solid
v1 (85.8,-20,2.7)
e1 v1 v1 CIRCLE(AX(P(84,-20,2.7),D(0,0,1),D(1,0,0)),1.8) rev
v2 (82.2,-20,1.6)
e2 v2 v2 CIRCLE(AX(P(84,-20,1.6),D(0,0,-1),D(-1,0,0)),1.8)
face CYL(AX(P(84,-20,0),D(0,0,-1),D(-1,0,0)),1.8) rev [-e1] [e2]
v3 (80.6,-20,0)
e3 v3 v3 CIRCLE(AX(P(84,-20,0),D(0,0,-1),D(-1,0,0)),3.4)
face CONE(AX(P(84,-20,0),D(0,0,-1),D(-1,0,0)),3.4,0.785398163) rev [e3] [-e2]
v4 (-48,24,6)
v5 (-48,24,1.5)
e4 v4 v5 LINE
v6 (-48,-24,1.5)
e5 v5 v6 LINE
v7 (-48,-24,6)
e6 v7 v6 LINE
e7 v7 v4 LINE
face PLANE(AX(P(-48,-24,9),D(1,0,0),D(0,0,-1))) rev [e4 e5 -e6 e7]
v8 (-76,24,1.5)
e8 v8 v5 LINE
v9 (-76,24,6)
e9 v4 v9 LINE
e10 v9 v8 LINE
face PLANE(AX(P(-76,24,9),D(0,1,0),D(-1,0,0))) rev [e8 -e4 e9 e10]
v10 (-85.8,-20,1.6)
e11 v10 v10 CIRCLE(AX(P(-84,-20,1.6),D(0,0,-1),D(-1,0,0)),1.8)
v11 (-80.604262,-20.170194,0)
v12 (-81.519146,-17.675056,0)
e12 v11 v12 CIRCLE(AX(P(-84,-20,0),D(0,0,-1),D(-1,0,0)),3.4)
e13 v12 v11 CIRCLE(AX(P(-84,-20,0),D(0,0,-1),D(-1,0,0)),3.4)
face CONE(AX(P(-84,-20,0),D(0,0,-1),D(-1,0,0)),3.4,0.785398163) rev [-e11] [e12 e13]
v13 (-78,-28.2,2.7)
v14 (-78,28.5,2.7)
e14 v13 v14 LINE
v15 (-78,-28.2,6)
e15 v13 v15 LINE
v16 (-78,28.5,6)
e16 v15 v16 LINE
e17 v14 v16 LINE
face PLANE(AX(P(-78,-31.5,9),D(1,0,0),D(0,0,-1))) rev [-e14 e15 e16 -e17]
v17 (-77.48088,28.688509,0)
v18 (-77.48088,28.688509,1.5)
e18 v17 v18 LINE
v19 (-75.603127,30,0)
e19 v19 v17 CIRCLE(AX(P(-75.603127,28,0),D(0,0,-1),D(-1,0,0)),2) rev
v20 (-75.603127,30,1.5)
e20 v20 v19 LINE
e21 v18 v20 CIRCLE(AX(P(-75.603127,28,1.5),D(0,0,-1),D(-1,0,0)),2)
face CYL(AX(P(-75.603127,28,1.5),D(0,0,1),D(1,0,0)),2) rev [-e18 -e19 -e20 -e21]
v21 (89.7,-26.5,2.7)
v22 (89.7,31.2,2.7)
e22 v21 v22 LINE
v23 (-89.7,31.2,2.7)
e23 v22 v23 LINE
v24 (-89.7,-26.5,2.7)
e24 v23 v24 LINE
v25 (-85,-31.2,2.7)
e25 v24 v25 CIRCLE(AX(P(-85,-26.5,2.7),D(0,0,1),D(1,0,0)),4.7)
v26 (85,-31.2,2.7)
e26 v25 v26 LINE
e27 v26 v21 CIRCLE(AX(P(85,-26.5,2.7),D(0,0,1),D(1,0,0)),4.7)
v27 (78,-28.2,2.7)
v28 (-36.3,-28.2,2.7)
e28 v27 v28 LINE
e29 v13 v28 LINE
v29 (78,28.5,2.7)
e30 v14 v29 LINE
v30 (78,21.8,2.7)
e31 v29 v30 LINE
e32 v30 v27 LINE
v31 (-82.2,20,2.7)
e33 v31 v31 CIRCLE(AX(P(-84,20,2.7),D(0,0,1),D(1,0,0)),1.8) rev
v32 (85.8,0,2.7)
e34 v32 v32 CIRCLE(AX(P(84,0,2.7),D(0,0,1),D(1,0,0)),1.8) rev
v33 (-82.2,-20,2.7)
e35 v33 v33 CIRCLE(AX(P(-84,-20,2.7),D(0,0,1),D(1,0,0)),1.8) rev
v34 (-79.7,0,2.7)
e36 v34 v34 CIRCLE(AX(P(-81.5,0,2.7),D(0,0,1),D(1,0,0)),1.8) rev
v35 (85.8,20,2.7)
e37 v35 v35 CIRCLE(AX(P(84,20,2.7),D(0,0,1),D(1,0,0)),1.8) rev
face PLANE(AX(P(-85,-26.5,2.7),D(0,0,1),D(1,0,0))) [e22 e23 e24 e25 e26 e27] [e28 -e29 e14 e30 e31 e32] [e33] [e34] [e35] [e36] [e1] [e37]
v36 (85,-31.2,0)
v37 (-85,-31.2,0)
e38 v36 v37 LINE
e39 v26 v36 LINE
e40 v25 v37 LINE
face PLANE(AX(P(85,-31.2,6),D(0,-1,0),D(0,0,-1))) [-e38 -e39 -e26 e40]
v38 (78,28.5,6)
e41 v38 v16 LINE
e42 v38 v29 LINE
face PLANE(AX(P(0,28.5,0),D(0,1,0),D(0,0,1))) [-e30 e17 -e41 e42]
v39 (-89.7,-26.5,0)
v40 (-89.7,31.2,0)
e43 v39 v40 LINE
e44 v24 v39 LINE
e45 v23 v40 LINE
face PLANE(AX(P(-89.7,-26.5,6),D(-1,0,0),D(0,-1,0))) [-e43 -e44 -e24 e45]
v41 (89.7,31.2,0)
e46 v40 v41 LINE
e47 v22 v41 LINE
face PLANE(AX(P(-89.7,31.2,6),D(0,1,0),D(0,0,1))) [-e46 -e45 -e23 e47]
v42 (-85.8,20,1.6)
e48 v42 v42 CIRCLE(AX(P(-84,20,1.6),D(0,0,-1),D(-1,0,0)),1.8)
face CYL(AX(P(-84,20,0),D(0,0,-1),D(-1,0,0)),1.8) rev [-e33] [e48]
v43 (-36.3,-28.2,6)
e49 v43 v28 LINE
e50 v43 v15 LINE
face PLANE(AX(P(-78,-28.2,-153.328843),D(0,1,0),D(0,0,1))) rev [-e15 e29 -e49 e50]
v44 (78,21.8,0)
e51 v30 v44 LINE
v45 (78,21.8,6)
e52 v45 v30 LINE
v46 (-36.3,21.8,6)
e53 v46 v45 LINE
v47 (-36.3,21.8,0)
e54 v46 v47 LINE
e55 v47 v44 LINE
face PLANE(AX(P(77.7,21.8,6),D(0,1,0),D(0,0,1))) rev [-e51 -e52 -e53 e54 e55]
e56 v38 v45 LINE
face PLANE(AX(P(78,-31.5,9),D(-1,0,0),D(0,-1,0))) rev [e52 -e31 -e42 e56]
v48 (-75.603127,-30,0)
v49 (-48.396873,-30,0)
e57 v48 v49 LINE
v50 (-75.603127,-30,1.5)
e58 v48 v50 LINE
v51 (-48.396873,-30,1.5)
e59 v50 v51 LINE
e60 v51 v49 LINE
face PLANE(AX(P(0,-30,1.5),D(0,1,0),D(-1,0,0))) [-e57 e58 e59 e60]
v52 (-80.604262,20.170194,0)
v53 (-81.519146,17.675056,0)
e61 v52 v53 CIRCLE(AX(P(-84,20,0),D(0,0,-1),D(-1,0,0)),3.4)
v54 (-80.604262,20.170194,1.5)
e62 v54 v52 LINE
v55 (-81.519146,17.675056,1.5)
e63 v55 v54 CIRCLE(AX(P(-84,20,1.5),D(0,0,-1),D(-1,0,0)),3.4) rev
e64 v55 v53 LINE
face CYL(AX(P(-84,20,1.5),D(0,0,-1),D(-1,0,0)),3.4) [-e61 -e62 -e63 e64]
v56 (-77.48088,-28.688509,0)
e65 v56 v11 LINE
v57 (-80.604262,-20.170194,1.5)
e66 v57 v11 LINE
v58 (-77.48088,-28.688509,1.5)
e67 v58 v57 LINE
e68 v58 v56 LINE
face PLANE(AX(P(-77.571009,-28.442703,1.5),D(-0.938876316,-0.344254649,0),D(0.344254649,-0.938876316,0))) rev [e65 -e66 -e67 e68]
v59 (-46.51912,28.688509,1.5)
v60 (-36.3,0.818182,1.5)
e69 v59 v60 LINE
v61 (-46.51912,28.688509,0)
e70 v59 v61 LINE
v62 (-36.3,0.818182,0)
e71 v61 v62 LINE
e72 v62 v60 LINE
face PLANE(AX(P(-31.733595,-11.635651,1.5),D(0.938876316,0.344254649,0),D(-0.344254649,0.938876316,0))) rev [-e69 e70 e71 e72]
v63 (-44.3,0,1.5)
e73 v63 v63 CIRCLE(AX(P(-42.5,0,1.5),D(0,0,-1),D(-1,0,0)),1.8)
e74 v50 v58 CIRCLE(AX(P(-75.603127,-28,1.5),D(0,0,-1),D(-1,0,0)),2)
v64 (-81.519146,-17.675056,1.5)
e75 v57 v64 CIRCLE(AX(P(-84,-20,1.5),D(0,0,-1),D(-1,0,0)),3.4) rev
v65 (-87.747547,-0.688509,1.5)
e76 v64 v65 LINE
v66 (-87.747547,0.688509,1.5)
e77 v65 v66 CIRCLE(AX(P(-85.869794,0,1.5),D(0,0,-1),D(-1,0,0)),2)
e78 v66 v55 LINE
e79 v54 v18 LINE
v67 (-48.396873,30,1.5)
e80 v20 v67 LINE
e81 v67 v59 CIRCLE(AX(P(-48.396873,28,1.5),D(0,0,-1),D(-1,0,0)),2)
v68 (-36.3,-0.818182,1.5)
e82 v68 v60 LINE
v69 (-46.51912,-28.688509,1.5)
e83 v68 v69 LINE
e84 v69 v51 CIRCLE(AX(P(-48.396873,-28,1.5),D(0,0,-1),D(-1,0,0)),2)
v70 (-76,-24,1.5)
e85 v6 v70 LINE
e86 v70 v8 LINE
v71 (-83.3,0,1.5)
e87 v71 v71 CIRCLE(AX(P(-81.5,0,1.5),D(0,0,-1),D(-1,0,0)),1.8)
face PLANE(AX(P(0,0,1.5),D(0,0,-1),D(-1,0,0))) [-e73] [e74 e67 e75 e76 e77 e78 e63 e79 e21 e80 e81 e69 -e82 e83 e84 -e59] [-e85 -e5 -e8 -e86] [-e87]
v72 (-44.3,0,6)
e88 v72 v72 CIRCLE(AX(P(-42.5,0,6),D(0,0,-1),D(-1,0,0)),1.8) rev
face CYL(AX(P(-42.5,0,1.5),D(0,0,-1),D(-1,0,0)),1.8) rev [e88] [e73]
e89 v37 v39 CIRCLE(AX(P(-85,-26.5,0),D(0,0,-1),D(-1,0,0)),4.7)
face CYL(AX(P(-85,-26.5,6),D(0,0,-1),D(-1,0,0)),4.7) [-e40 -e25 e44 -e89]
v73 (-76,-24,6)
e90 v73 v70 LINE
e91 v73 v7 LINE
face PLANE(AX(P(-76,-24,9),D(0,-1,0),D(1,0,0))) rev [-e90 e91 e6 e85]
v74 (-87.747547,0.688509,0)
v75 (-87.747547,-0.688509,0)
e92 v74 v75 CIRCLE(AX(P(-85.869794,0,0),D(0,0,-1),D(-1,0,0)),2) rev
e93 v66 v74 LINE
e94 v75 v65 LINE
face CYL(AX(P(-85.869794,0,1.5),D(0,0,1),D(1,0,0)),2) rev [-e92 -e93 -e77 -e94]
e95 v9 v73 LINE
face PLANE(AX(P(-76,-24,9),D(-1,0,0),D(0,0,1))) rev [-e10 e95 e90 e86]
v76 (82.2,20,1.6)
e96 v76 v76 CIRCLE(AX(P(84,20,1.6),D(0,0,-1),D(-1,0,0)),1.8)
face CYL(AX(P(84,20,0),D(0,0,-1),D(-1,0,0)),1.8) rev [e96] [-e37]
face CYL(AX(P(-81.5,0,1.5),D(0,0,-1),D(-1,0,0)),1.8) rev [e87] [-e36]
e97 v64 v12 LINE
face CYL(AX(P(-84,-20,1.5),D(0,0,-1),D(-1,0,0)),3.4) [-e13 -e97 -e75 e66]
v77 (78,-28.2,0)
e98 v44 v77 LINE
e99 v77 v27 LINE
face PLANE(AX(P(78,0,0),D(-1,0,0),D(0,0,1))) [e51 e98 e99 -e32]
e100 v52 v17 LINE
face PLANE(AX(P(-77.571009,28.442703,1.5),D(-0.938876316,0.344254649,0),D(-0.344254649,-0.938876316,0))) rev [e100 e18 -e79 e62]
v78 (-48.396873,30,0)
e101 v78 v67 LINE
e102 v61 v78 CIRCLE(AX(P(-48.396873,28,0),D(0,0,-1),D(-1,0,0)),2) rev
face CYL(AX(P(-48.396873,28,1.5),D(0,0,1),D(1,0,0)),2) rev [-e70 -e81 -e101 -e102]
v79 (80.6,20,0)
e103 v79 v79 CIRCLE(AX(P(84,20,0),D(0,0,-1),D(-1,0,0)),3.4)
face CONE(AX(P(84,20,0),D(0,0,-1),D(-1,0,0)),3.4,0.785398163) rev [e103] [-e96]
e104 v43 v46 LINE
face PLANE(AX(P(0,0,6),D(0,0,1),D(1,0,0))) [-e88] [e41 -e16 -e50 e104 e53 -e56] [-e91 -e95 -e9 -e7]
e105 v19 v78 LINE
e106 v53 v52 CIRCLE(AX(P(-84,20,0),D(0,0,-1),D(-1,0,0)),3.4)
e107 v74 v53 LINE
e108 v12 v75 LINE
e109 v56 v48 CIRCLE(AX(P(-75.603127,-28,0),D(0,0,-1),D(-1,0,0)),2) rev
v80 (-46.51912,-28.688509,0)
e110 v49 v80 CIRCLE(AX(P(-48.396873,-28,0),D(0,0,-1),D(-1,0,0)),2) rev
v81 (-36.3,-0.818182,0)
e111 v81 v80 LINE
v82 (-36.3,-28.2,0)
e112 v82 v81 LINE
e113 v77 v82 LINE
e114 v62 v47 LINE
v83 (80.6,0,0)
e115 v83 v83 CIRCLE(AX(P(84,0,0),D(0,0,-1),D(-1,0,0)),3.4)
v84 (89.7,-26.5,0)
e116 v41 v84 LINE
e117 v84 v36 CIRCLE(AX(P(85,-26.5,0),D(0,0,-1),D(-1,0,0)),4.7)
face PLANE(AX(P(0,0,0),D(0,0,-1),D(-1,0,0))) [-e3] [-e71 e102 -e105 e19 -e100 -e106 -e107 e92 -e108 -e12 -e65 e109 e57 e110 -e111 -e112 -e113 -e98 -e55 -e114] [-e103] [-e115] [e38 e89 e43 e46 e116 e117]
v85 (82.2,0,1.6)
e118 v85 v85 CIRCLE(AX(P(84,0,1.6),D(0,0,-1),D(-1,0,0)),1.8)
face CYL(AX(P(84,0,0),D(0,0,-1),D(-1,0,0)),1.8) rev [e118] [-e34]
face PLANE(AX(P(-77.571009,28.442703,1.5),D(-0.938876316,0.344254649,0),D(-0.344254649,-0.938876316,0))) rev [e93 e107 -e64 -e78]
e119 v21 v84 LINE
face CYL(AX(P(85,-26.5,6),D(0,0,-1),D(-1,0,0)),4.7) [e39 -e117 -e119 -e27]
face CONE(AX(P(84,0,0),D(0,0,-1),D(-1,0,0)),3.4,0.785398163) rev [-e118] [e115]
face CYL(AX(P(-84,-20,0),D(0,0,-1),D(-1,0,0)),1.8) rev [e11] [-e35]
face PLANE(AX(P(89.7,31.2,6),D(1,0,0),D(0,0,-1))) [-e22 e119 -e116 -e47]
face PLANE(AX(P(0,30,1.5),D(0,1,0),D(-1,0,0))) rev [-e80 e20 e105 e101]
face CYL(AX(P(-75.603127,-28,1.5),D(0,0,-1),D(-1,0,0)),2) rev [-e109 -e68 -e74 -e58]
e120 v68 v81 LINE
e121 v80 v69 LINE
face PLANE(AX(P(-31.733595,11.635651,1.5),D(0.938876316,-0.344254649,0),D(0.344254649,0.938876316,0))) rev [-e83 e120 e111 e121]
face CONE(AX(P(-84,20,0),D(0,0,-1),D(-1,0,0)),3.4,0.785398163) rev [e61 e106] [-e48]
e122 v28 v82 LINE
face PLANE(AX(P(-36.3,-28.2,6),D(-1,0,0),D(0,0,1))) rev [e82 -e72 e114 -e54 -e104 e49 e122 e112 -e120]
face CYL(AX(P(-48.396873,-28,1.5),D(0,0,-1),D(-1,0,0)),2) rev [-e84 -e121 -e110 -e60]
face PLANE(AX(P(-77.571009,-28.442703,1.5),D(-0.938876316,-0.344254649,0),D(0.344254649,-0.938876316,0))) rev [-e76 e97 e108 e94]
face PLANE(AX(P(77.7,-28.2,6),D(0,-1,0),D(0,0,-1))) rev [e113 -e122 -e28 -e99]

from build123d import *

# Parameters (mm, degrees)
SKETCH1_W                                       = 180
SKETCH1_H                                       = 63
BOSS_EXTRUDE1_DEPTH                             = 3
FILLET1_R                                       = 5
SKETCH2_W                                       = 156
SKETCH2_H                                       = 63
BOSS_EXTRUDE2_DEPTH                             = 6
CSK_FOR_M3_FLAT_HEAD_MACHINE_SCREW1_D           = 3.6
CSK_FOR_M3_FLAT_HEAD_MACHINE_SCREW1_DEPTH       = 8
CSK_FOR_M3_FLAT_HEAD_MACHINE_SCREW1_CSINK_D     = 6.8
CSK_FOR_M3_FLAT_HEAD_MACHINE_SCREW1_CSINK_ANGLE = 90
CSK_FOR_M3_FLAT_HEAD_MACHINE_SCREW1_TIP         = 1.081549114
CUT_EXTRUDE1_START                              = -1.5
CUT_EXTRUDE1_DEPTH                              = 1.5
SKETCH6_W                                       = 28
SKETCH6_H                                       = 48
CUT_EXTRUDE2_DEPTH                              = 96.647791402
FILLET2_R                                       = 2
M3_CLEARANCE_HOLE1_D                            = 3.6
M3_CLEARANCE_HOLE1_DEPTH                        = 8
M3_CLEARANCE_HOLE1_TIP                          = 1.081549114
SKETCH15_W                                      = 95
SKETCH15_H                                      = 63
CUT_EXTRUDE3_DEPTH                              = 3
SKETCH18_W                                      = 180
SKETCH18_H                                      = 8
CUT_EXTRUDE8_DEPTH                              = 3
SKETCH21_W                                      = 4
SKETCH21_H                                      = 60
CUT_EXTRUDE10_DEPTH                             = 3
SKETCH22_W                                      = 3
SKETCH22_H                                      = 60
CUT_EXTRUDE11_DEPTH                             = 116.733530146
CUT_EXTRUDE12_DEPTH                             = 0.3
CUT_EXTRUDE13_DEPTH                             = 96.541875636
SKETCH25_W                                      = 114
SKETCH25_H                                      = 50
CUT_EXTRUDE14_DEPTH                             = 96.160548548
SKETCH26_W                                      = 6
SKETCH26_H                                      = 50
CUT_EXTRUDE15_DEPTH                             = 0.3
SKETCH28_W                                      = 156
SKETCH28_H                                      = 3
CUT_EXTRUDE16_DEPTH                             = 3.3


# Read off the part's stored shape, not the designer's step: Cut-Extrude1
with BuildPart() as part:
    # Sketch1 → Boss-Extrude1 (new body)
    with BuildSketch(Plane.XY):
        Rectangle(SKETCH1_W, SKETCH1_H)
    extrude(amount=BOSS_EXTRUDE1_DEPTH)

    # Fillet1
    fillet1_edges = [part.edges().sort_by_distance(p)[0] for p in [
        (90, -31.5, 1.5),
        (-90, -31.5, 1.5),
    ]]
    fillet(fillet1_edges, radius=FILLET1_R)

    # Sketch2 → Boss-Extrude2 (add)
    with BuildSketch(Plane.XY.offset(3)):
        Rectangle(SKETCH2_W, SKETCH2_H)
    extrude(amount=BOSS_EXTRUDE2_DEPTH)

    # CSK for M3 Flat Head Machine Screw1
    with Locations(Plane(origin=(0, 0, 0), x_dir=(-1, 0, 0), z_dir=(0, 0, -1))):
        with Locations((-84, 20), (-84, -20), (84, 20), (84, -20), (-84, 0)):
            CounterSinkHole(CSK_FOR_M3_FLAT_HEAD_MACHINE_SCREW1_D / 2, CSK_FOR_M3_FLAT_HEAD_MACHINE_SCREW1_CSINK_D / 2, depth=CSK_FOR_M3_FLAT_HEAD_MACHINE_SCREW1_DEPTH, counter_sink_angle=CSK_FOR_M3_FLAT_HEAD_MACHINE_SCREW1_CSINK_ANGLE)
            with Locations((0, 0, -(CSK_FOR_M3_FLAT_HEAD_MACHINE_SCREW1_DEPTH + CSK_FOR_M3_FLAT_HEAD_MACHINE_SCREW1_TIP / 2))):  # 118° drill point
                Cone(0, CSK_FOR_M3_FLAT_HEAD_MACHINE_SCREW1_D / 2, CSK_FOR_M3_FLAT_HEAD_MACHINE_SCREW1_TIP, mode=Mode.SUBTRACT)

    # Cut-Extrude1 outline → Cut-Extrude1 (cut)
    with BuildSketch(Plane(origin=(0, 0, 0), x_dir=(-1, 0, 0), z_dir=(0, 0, -1)).offset(CUT_EXTRUDE1_START)):
        with BuildLine():
            Line((77, 30), (47, 30))
            Line((47, 30), (36, 0))
            Line((36, 0), (47, -30))
            Line((47, -30), (77, -30))
            Line((77, -30), (80.604262356, -20.170193575))
            ThreePointArc((80.604262356, -20.170193575), (80.807820526, -18.829534193), (81.519146067, -17.67505618))
            Line((81.519146067, -17.67505618), (88, 0))
            Line((88, 0), (81.519146067, 17.67505618))
            ThreePointArc((81.519146067, 17.67505618), (80.807820526, 18.829534193), (80.604262356, 20.170193575))
            Line((80.604262356, 20.170193575), (77, 30))
        make_face()
    extrude(amount=CUT_EXTRUDE1_DEPTH, mode=Mode.SUBTRACT)

    # Sketch6 → Cut-Extrude2 (cut, through all)
    with BuildSketch(Plane(origin=(0, 0, 1.5), x_dir=(-1, 0, 0), z_dir=(0, 0, -1))):
        with Locations((62, 0)):
            Rectangle(SKETCH6_W, SKETCH6_H)
    extrude(amount=-CUT_EXTRUDE2_DEPTH, mode=Mode.SUBTRACT)

    # Fillet2
    fillet2_edges = [part.edges().sort_by_distance(p)[0] for p in [
        (-36, 0, 0.75),
        (-47, 30, 0.75),
        (-77, 30, 0.75),
        (-88, 0, 0.75),
        (-77, -30, 0.75),
        (-47, -30, 0.75),
    ]]
    fillet(fillet2_edges, radius=FILLET2_R)

    # M3 Clearance Hole1
    with Locations(Plane(origin=(0, 0, 1.5), x_dir=(-1, 0, 0), z_dir=(0, 0, -1))):
        with Locations((42.5, 0), (81.5, 0)):
            Hole(M3_CLEARANCE_HOLE1_D / 2, depth=M3_CLEARANCE_HOLE1_DEPTH)
            with Locations((0, 0, -(M3_CLEARANCE_HOLE1_DEPTH + M3_CLEARANCE_HOLE1_TIP / 2))):  # 118° drill point
                Cone(0, M3_CLEARANCE_HOLE1_D / 2, M3_CLEARANCE_HOLE1_TIP, mode=Mode.SUBTRACT)

    # Sketch15 → Cut-Extrude3 (cut)
    with BuildSketch(Plane.XY.offset(9)):
        with Locations((26.5, 0)):
            Rectangle(SKETCH15_W, SKETCH15_H)
    extrude(amount=-CUT_EXTRUDE3_DEPTH, mode=Mode.SUBTRACT)

    # Sketch18 → Cut-Extrude8 (cut)
    with BuildSketch(Plane(origin=(0, 31.5, 0), x_dir=(1, 0, 0), z_dir=(0, 1, 0))):
        with Locations((0, -7)):
            Rectangle(SKETCH18_W, SKETCH18_H)
    extrude(amount=-CUT_EXTRUDE8_DEPTH, mode=Mode.SUBTRACT)

    # Sketch21 → Cut-Extrude10 (cut)
    with BuildSketch(Plane.XY.offset(9)):
        with Locations((76, -1.5)):
            Rectangle(SKETCH21_W, SKETCH21_H)
    extrude(amount=-CUT_EXTRUDE10_DEPTH, mode=Mode.SUBTRACT)

    # Sketch22 → Cut-Extrude11 (cut, through all)
    with BuildSketch(Plane(origin=(-21, 0, 0), x_dir=(0, 0, -1), z_dir=(1, 0, 0))):
        with Locations((-7.5, -1.5)):
            Rectangle(SKETCH22_W, SKETCH22_H)
    extrude(amount=-CUT_EXTRUDE11_DEPTH, mode=Mode.SUBTRACT)

    # Sketch23 → Cut-Extrude12 (cut)
    with BuildSketch(Plane.XY.offset(3)):
        with BuildLine():
            Line((90, 31.5), (-90, 31.5))
            Line((-90, 31.5), (-90, -26.5))
            ThreePointArc((-90, -26.5), (-88.535533906, -30.035533906), (-85, -31.5))
            Line((-85, -31.5), (-78, -31.5))
            Line((-78, -31.5), (-78, 28.5))
            Line((-78, 28.5), (78, 28.5))
            Line((78, 28.5), (78, -31.5))
            Line((78, -31.5), (85, -31.5))
            ThreePointArc((85, -31.5), (88.535533906, -30.035533906), (90, -26.5))
            Line((90, -26.5), (90, 31.5))
        make_face()
    extrude(amount=-CUT_EXTRUDE12_DEPTH, mode=Mode.SUBTRACT)

    # Sketch24 → Cut-Extrude13 (cut, through all)
    with BuildSketch(Plane(origin=(0, 0, 0), x_dir=(-1, 0, 0), z_dir=(0, 0, -1))):
        with BuildLine():
            Line((90, 31.5), (90, -26.5))
            ThreePointArc((90, -26.5), (88.535533906, -30.035533906), (85, -31.5))
            Line((85, -31.5), (-85, -31.5))
            ThreePointArc((-85, -31.5), (-88.535533906, -30.035533906), (-90, -26.5))
            Line((-90, -26.5), (-90, 31.5))
            Line((-90, 31.5), (90, 31.5))
        make_face()
        with BuildLine():
            Line((-85, -31.2), (85, -31.2))
            ThreePointArc((85, -31.2), (88.323401872, -29.823401872), (89.7, -26.5))
            Line((89.7, -26.5), (89.7, 31.2))
            Line((89.7, 31.2), (-89.7, 31.2))
            Line((-89.7, 31.2), (-89.7, -26.5))
            ThreePointArc((-89.7, -26.5), (-88.323401872, -29.823401872), (-85, -31.2))
        make_face(mode=Mode.SUBTRACT)
    extrude(amount=-CUT_EXTRUDE13_DEPTH, mode=Mode.SUBTRACT)

    # Sketch25 → Cut-Extrude14 (cut, through all)
    with BuildSketch(Plane(origin=(0, 0, 0), x_dir=(-1, 0, 0), z_dir=(0, 0, -1))):
        with Locations((-20.7, -3.2)):
            Rectangle(SKETCH25_W, SKETCH25_H)
    extrude(amount=-CUT_EXTRUDE14_DEPTH, mode=Mode.SUBTRACT)

    # Sketch26 → Cut-Extrude15 (cut)
    with BuildSketch(Plane.ZY.offset(-77.7)):
        with Locations((3, -3.2)):
            Rectangle(SKETCH26_W, SKETCH26_H)
    extrude(amount=-CUT_EXTRUDE15_DEPTH, mode=Mode.SUBTRACT)

    # Sketch28 → Cut-Extrude16 (cut)
    with BuildSketch(Plane.XY.offset(6)):
        with Locations((0, -29.7)):
            Rectangle(SKETCH28_W, SKETCH28_H)
    extrude(amount=-CUT_EXTRUDE16_DEPTH, mode=Mode.SUBTRACT)


solid = part.part
